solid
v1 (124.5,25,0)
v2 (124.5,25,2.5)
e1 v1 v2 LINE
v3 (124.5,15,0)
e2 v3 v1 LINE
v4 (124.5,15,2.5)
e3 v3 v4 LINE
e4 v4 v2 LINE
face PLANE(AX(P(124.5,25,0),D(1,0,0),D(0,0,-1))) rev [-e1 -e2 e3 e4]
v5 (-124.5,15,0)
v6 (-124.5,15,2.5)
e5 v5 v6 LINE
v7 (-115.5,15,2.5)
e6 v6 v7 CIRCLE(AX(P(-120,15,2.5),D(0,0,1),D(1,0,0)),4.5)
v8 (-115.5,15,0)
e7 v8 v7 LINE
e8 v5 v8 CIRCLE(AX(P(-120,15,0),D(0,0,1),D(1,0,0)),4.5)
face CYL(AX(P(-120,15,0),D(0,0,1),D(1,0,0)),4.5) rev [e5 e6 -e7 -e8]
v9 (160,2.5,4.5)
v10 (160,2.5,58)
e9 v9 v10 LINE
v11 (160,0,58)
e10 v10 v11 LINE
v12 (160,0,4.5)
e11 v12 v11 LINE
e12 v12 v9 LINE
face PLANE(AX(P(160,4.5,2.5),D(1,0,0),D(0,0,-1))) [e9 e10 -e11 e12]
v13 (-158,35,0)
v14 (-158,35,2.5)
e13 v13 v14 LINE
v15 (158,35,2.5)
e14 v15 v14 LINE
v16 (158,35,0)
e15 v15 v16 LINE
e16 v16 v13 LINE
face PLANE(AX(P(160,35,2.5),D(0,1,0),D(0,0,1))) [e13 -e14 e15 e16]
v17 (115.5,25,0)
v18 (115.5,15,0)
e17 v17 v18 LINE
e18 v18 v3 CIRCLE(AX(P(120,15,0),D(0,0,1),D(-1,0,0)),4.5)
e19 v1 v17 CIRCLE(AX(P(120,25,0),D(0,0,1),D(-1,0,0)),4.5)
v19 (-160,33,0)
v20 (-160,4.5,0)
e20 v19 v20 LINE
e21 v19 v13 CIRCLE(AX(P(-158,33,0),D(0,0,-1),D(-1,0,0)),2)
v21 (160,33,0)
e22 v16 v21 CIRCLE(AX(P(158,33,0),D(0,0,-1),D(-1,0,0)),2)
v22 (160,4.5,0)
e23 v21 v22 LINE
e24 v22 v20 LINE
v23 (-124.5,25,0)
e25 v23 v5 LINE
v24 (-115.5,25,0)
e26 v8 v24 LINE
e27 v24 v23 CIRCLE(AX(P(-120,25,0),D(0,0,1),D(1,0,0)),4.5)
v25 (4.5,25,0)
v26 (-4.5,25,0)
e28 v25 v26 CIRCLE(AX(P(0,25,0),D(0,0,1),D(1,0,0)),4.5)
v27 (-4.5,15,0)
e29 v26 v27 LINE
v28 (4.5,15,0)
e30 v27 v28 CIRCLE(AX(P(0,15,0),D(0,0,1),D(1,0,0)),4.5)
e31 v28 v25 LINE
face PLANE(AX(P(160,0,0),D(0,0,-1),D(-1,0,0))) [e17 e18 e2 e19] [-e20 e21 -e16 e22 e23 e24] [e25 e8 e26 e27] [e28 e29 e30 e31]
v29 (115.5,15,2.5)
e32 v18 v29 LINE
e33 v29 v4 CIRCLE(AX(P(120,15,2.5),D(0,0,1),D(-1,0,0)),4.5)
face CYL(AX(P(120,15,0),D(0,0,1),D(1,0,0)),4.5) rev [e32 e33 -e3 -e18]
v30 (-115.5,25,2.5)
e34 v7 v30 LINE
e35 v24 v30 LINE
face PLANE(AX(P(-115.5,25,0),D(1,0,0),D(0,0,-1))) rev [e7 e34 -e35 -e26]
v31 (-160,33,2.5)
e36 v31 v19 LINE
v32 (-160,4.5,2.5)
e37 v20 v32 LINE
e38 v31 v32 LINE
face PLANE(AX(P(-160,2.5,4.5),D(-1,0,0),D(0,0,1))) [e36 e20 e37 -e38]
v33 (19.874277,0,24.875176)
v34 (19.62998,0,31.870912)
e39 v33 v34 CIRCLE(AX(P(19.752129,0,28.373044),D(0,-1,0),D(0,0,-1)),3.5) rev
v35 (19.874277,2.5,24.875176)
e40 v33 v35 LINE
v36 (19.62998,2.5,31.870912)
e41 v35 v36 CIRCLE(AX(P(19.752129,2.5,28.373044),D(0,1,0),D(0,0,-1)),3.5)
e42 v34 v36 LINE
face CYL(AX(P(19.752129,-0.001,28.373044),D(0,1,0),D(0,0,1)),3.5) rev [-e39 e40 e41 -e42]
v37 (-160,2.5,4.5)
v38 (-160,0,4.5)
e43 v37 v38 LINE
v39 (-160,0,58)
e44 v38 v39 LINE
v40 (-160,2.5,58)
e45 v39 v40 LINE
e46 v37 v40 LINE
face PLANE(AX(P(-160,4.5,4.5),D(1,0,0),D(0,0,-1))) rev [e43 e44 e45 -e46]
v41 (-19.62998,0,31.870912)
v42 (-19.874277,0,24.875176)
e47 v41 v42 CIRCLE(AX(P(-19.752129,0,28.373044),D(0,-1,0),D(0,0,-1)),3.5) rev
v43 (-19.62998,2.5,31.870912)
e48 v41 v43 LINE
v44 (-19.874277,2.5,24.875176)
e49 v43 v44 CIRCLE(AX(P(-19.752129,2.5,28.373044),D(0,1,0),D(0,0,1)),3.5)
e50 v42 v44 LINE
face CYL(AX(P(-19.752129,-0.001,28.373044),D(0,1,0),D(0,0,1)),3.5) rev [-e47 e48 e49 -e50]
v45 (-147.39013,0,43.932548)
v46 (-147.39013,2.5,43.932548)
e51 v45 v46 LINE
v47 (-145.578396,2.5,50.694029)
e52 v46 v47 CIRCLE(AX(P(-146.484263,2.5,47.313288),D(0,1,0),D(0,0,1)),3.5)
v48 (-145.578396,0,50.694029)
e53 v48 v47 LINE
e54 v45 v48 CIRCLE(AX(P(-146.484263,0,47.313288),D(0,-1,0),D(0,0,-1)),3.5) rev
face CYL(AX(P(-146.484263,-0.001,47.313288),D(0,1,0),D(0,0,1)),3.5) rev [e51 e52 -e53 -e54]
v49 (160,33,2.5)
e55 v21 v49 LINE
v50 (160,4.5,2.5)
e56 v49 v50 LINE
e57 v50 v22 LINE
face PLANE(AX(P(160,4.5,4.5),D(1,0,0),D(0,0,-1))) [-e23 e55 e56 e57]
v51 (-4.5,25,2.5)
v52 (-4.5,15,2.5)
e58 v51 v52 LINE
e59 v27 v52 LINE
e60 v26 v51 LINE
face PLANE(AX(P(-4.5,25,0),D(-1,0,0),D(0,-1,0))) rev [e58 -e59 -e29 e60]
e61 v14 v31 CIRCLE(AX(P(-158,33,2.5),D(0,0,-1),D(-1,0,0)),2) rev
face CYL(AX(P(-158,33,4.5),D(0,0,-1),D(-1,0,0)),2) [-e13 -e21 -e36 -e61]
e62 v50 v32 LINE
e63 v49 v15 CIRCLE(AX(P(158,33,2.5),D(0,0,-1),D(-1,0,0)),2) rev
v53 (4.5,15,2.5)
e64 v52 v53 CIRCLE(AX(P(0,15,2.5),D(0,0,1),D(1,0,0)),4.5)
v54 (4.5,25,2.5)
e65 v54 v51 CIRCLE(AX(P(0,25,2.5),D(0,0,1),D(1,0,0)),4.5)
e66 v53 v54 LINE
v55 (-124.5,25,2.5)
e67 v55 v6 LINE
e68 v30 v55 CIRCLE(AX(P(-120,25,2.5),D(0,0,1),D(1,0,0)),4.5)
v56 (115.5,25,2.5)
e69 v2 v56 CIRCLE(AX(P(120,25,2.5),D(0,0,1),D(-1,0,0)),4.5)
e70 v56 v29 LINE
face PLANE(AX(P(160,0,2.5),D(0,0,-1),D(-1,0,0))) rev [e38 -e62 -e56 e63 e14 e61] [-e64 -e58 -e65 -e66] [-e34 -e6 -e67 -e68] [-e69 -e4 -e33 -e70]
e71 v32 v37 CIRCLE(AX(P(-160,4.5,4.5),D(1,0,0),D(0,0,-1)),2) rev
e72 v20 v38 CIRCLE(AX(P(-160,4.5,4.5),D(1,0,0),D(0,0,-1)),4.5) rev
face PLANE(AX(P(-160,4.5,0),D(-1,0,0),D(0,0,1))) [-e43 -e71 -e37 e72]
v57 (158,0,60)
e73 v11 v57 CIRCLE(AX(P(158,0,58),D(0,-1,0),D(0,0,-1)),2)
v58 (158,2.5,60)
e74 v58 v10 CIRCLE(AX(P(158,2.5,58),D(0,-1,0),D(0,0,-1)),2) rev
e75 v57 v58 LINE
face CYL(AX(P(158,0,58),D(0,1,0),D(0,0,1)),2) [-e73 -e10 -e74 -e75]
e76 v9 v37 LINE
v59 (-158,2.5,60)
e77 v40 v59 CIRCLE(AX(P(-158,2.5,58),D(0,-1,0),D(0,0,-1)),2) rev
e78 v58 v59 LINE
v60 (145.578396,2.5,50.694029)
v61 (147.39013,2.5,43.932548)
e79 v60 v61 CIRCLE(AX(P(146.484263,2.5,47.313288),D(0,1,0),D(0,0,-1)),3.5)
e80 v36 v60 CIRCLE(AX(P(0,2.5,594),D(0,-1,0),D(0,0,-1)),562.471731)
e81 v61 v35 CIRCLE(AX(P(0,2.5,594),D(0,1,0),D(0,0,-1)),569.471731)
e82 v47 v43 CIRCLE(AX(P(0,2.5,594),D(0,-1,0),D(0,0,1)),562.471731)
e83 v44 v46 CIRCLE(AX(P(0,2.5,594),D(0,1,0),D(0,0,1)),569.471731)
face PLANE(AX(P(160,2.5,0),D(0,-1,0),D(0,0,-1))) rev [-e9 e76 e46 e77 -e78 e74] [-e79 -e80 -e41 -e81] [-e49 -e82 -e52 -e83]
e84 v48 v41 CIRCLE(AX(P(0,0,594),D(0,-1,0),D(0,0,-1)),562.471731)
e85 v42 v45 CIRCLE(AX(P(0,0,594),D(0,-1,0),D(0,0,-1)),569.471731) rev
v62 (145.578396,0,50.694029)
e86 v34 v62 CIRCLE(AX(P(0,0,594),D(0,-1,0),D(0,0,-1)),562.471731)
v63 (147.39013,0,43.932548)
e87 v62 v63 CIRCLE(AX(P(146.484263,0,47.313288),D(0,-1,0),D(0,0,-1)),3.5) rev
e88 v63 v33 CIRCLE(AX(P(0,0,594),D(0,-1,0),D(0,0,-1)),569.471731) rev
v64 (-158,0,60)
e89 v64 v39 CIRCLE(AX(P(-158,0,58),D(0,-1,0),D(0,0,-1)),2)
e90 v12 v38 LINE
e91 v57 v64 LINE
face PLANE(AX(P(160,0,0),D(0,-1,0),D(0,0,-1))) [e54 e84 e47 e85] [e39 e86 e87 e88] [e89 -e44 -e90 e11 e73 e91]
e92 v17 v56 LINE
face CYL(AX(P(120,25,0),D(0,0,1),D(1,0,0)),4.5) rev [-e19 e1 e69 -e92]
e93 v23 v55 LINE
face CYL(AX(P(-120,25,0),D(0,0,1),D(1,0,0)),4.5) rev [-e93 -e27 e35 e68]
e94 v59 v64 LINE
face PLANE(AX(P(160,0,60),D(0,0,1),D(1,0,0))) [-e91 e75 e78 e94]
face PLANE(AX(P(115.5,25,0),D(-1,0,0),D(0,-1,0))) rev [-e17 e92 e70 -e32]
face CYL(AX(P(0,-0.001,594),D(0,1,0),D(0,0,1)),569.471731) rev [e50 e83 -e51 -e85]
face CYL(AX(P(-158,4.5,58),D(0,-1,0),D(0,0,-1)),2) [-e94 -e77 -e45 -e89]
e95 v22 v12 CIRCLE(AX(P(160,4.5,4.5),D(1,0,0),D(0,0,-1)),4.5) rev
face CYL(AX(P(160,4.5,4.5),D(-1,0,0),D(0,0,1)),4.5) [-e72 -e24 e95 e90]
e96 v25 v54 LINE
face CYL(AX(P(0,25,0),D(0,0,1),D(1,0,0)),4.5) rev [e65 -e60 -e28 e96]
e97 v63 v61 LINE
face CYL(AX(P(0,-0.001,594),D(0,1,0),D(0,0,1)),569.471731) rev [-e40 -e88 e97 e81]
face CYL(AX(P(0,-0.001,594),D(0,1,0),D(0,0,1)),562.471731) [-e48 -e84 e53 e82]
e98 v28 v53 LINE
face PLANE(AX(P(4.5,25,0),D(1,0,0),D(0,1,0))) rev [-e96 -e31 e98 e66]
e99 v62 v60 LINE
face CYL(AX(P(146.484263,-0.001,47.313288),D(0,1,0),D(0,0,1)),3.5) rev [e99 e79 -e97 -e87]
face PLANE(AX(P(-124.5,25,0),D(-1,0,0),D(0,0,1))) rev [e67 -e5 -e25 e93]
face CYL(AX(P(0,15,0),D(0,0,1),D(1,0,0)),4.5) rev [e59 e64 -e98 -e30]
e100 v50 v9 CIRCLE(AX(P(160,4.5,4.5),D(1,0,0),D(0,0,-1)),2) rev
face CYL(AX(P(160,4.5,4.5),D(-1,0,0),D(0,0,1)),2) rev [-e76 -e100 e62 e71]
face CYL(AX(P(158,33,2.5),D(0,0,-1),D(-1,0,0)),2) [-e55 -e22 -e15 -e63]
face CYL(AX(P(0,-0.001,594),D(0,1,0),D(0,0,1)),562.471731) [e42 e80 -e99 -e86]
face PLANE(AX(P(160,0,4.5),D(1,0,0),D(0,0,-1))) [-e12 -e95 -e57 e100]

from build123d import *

# Parameters (mm, degrees)
SM_BASE_FLANGE_1_DEPTH = 160
CUT_EXTRUDE_2_DEPTH    = 174.583553368
CUT_EXTRUDE_3_REACH    = 175.943
OTHER_1_DEPTH          = 2.5
OTHER_1_2_DEPTH        = 2.5


# Read off the part's stored shape, not the designer's step: 断开-边角1
# Sheet-metal steps are written as plain solids
with BuildPart() as part:
    # Sketch 1 → 基体-法兰1 (new, symmetric)
    with BuildSketch(Plane(origin=(0, 0, 0), x_dir=(0, 0, -1), z_dir=(1, 0, 0))):
        with BuildLine():
            Line((-60, 0), (-4.5, 0))
            ThreePointArc((-4.5, 0), (-1.318019485, 1.318019485), (0, 4.5))
            Line((0, 4.5), (0, 35))
            Line((0, 35), (-2.5, 35))
            Line((-2.5, 35), (-2.5, 4.5))
            ThreePointArc((-2.5, 4.5), (-3.085786438, 3.085786438), (-4.5, 2.5))
            Line((-4.5, 2.5), (-60, 2.5))
            Line((-60, 2.5), (-60, 0))
        make_face()
    extrude(amount=SM_BASE_FLANGE_1_DEPTH, both=True)

    # 草图5 → 切除-拉伸2 (cut, through all)
    with BuildSketch(Plane.XY.offset(2.5)):
        with BuildLine():
            Line((-115.5, 25), (-115.5, 15))
            ThreePointArc((-115.5, 15), (-120, 10.5), (-124.5, 15))
            Line((-124.5, 15), (-124.5, 25))
            ThreePointArc((-124.5, 25), (-120, 29.5), (-115.5, 25))
        make_face()
        with BuildLine():
            Line((115.5, 25), (115.5, 15))
            ThreePointArc((115.5, 15), (120, 10.5), (124.5, 15))
            Line((124.5, 15), (124.5, 25))
            ThreePointArc((124.5, 25), (120, 29.5), (115.5, 25))
        make_face()
        with BuildLine():
            Line((4.5, 25), (4.5, 15))
            ThreePointArc((4.5, 15), (0, 10.5), (-4.5, 15))
            Line((-4.5, 15), (-4.5, 25))
            ThreePointArc((-4.5, 25), (0, 29.5), (4.5, 25))
        make_face()
    extrude(amount=-CUT_EXTRUDE_2_DEPTH, mode=Mode.SUBTRACT)

    # 草图6 → 切除-拉伸3 (cut, up to next)
    with BuildSketch(Plane(origin=(0, 2.5, 0), x_dir=(1, 0, 0), z_dir=(0, 1, 0)), mode=Mode.PRIVATE) as cut_extrude_3_sk1:
        with BuildLine():
            ThreePointArc((-19.874276789, -24.875176049), (-84.173281176, -30.783424559), (-147.390129564, -43.932547934))
            ThreePointArc((-147.390129564, -43.932547934), (-149.865003298, -48.219154984), (-145.578396248, -50.694028718))
            ThreePointArc((-145.578396248, -50.694028718), (-83.138615298, -37.706535603), (-19.629980312, -31.870911838))
            ThreePointArc((-19.629980312, -31.870911838), (-16.254260656, -28.250895705), (-19.874276789, -24.875176049))
        make_face()
    cut_extrude_3_tool1 = extrude(cut_extrude_3_sk1.sketch, amount=-CUT_EXTRUDE_3_REACH, mode=Mode.PRIVATE) & part.part
    # 草图6 → 切除-拉伸3 (cut, up to next)
    with BuildSketch(Plane(origin=(0, 2.5, 0), x_dir=(1, 0, 0), z_dir=(0, 1, 0)), mode=Mode.PRIVATE) as cut_extrude_3_sk2:
        with BuildLine():
            ThreePointArc((19.874276789, -24.875176049), (84.173281176, -30.783424559), (147.390129564, -43.932547934))
            ThreePointArc((147.390129564, -43.932547934), (149.865003298, -48.219154984), (145.578396248, -50.694028718))
            ThreePointArc((145.578396248, -50.694028718), (83.138615298, -37.706535603), (19.629980312, -31.870911838))
            ThreePointArc((19.629980312, -31.870911838), (16.254260656, -28.250895705), (19.874276789, -24.875176049))
        make_face()
    cut_extrude_3_tool2 = extrude(cut_extrude_3_sk2.sketch, amount=-CUT_EXTRUDE_3_REACH, mode=Mode.PRIVATE) & part.part
    add(cut_extrude_3_tool1.solids().sort_by_distance((-83.461905, 2.5, 35.543351))[0], mode=Mode.SUBTRACT)
    add(cut_extrude_3_tool2.solids().sort_by_distance((83.461905, 2.5, 35.543351))[0], mode=Mode.SUBTRACT)

    # Other 1 outline → Other 1 (cut)
    with BuildSketch(Plane(origin=(0, 0, 0), x_dir=(1, 0, 0), z_dir=(0, 1, 0))):
        with BuildLine():
            Line((-160, -60), (-158, -60))
            ThreePointArc((-158, -60), (-159.414213562, -59.414213562), (-160, -58))
            Line((-160, -58), (-160, -60))
        make_face()
        with BuildLine():
            ThreePointArc((160, -58), (159.414213562, -59.414213562), (158, -60))
            Line((158, -60), (160, -60))
            Line((160, -60), (160, -58))
        make_face()
    extrude(amount=OTHER_1_DEPTH, mode=Mode.SUBTRACT)

    # Other 1 2 outline → Other 1 2 (cut)
    with BuildSketch(Plane.XY):
        with BuildLine():
            Line((160, 35), (158, 35))
            ThreePointArc((158, 35), (159.414213562, 34.414213562), (160, 33))
            Line((160, 33), (160, 35))
        make_face()
        with BuildLine():
            ThreePointArc((-160, 33), (-159.414213562, 34.414213562), (-158, 35))
            Line((-158, 35), (-160, 35))
            Line((-160, 35), (-160, 33))
        make_face()
    extrude(amount=OTHER_1_2_DEPTH, mode=Mode.SUBTRACT)


solid = part.part
